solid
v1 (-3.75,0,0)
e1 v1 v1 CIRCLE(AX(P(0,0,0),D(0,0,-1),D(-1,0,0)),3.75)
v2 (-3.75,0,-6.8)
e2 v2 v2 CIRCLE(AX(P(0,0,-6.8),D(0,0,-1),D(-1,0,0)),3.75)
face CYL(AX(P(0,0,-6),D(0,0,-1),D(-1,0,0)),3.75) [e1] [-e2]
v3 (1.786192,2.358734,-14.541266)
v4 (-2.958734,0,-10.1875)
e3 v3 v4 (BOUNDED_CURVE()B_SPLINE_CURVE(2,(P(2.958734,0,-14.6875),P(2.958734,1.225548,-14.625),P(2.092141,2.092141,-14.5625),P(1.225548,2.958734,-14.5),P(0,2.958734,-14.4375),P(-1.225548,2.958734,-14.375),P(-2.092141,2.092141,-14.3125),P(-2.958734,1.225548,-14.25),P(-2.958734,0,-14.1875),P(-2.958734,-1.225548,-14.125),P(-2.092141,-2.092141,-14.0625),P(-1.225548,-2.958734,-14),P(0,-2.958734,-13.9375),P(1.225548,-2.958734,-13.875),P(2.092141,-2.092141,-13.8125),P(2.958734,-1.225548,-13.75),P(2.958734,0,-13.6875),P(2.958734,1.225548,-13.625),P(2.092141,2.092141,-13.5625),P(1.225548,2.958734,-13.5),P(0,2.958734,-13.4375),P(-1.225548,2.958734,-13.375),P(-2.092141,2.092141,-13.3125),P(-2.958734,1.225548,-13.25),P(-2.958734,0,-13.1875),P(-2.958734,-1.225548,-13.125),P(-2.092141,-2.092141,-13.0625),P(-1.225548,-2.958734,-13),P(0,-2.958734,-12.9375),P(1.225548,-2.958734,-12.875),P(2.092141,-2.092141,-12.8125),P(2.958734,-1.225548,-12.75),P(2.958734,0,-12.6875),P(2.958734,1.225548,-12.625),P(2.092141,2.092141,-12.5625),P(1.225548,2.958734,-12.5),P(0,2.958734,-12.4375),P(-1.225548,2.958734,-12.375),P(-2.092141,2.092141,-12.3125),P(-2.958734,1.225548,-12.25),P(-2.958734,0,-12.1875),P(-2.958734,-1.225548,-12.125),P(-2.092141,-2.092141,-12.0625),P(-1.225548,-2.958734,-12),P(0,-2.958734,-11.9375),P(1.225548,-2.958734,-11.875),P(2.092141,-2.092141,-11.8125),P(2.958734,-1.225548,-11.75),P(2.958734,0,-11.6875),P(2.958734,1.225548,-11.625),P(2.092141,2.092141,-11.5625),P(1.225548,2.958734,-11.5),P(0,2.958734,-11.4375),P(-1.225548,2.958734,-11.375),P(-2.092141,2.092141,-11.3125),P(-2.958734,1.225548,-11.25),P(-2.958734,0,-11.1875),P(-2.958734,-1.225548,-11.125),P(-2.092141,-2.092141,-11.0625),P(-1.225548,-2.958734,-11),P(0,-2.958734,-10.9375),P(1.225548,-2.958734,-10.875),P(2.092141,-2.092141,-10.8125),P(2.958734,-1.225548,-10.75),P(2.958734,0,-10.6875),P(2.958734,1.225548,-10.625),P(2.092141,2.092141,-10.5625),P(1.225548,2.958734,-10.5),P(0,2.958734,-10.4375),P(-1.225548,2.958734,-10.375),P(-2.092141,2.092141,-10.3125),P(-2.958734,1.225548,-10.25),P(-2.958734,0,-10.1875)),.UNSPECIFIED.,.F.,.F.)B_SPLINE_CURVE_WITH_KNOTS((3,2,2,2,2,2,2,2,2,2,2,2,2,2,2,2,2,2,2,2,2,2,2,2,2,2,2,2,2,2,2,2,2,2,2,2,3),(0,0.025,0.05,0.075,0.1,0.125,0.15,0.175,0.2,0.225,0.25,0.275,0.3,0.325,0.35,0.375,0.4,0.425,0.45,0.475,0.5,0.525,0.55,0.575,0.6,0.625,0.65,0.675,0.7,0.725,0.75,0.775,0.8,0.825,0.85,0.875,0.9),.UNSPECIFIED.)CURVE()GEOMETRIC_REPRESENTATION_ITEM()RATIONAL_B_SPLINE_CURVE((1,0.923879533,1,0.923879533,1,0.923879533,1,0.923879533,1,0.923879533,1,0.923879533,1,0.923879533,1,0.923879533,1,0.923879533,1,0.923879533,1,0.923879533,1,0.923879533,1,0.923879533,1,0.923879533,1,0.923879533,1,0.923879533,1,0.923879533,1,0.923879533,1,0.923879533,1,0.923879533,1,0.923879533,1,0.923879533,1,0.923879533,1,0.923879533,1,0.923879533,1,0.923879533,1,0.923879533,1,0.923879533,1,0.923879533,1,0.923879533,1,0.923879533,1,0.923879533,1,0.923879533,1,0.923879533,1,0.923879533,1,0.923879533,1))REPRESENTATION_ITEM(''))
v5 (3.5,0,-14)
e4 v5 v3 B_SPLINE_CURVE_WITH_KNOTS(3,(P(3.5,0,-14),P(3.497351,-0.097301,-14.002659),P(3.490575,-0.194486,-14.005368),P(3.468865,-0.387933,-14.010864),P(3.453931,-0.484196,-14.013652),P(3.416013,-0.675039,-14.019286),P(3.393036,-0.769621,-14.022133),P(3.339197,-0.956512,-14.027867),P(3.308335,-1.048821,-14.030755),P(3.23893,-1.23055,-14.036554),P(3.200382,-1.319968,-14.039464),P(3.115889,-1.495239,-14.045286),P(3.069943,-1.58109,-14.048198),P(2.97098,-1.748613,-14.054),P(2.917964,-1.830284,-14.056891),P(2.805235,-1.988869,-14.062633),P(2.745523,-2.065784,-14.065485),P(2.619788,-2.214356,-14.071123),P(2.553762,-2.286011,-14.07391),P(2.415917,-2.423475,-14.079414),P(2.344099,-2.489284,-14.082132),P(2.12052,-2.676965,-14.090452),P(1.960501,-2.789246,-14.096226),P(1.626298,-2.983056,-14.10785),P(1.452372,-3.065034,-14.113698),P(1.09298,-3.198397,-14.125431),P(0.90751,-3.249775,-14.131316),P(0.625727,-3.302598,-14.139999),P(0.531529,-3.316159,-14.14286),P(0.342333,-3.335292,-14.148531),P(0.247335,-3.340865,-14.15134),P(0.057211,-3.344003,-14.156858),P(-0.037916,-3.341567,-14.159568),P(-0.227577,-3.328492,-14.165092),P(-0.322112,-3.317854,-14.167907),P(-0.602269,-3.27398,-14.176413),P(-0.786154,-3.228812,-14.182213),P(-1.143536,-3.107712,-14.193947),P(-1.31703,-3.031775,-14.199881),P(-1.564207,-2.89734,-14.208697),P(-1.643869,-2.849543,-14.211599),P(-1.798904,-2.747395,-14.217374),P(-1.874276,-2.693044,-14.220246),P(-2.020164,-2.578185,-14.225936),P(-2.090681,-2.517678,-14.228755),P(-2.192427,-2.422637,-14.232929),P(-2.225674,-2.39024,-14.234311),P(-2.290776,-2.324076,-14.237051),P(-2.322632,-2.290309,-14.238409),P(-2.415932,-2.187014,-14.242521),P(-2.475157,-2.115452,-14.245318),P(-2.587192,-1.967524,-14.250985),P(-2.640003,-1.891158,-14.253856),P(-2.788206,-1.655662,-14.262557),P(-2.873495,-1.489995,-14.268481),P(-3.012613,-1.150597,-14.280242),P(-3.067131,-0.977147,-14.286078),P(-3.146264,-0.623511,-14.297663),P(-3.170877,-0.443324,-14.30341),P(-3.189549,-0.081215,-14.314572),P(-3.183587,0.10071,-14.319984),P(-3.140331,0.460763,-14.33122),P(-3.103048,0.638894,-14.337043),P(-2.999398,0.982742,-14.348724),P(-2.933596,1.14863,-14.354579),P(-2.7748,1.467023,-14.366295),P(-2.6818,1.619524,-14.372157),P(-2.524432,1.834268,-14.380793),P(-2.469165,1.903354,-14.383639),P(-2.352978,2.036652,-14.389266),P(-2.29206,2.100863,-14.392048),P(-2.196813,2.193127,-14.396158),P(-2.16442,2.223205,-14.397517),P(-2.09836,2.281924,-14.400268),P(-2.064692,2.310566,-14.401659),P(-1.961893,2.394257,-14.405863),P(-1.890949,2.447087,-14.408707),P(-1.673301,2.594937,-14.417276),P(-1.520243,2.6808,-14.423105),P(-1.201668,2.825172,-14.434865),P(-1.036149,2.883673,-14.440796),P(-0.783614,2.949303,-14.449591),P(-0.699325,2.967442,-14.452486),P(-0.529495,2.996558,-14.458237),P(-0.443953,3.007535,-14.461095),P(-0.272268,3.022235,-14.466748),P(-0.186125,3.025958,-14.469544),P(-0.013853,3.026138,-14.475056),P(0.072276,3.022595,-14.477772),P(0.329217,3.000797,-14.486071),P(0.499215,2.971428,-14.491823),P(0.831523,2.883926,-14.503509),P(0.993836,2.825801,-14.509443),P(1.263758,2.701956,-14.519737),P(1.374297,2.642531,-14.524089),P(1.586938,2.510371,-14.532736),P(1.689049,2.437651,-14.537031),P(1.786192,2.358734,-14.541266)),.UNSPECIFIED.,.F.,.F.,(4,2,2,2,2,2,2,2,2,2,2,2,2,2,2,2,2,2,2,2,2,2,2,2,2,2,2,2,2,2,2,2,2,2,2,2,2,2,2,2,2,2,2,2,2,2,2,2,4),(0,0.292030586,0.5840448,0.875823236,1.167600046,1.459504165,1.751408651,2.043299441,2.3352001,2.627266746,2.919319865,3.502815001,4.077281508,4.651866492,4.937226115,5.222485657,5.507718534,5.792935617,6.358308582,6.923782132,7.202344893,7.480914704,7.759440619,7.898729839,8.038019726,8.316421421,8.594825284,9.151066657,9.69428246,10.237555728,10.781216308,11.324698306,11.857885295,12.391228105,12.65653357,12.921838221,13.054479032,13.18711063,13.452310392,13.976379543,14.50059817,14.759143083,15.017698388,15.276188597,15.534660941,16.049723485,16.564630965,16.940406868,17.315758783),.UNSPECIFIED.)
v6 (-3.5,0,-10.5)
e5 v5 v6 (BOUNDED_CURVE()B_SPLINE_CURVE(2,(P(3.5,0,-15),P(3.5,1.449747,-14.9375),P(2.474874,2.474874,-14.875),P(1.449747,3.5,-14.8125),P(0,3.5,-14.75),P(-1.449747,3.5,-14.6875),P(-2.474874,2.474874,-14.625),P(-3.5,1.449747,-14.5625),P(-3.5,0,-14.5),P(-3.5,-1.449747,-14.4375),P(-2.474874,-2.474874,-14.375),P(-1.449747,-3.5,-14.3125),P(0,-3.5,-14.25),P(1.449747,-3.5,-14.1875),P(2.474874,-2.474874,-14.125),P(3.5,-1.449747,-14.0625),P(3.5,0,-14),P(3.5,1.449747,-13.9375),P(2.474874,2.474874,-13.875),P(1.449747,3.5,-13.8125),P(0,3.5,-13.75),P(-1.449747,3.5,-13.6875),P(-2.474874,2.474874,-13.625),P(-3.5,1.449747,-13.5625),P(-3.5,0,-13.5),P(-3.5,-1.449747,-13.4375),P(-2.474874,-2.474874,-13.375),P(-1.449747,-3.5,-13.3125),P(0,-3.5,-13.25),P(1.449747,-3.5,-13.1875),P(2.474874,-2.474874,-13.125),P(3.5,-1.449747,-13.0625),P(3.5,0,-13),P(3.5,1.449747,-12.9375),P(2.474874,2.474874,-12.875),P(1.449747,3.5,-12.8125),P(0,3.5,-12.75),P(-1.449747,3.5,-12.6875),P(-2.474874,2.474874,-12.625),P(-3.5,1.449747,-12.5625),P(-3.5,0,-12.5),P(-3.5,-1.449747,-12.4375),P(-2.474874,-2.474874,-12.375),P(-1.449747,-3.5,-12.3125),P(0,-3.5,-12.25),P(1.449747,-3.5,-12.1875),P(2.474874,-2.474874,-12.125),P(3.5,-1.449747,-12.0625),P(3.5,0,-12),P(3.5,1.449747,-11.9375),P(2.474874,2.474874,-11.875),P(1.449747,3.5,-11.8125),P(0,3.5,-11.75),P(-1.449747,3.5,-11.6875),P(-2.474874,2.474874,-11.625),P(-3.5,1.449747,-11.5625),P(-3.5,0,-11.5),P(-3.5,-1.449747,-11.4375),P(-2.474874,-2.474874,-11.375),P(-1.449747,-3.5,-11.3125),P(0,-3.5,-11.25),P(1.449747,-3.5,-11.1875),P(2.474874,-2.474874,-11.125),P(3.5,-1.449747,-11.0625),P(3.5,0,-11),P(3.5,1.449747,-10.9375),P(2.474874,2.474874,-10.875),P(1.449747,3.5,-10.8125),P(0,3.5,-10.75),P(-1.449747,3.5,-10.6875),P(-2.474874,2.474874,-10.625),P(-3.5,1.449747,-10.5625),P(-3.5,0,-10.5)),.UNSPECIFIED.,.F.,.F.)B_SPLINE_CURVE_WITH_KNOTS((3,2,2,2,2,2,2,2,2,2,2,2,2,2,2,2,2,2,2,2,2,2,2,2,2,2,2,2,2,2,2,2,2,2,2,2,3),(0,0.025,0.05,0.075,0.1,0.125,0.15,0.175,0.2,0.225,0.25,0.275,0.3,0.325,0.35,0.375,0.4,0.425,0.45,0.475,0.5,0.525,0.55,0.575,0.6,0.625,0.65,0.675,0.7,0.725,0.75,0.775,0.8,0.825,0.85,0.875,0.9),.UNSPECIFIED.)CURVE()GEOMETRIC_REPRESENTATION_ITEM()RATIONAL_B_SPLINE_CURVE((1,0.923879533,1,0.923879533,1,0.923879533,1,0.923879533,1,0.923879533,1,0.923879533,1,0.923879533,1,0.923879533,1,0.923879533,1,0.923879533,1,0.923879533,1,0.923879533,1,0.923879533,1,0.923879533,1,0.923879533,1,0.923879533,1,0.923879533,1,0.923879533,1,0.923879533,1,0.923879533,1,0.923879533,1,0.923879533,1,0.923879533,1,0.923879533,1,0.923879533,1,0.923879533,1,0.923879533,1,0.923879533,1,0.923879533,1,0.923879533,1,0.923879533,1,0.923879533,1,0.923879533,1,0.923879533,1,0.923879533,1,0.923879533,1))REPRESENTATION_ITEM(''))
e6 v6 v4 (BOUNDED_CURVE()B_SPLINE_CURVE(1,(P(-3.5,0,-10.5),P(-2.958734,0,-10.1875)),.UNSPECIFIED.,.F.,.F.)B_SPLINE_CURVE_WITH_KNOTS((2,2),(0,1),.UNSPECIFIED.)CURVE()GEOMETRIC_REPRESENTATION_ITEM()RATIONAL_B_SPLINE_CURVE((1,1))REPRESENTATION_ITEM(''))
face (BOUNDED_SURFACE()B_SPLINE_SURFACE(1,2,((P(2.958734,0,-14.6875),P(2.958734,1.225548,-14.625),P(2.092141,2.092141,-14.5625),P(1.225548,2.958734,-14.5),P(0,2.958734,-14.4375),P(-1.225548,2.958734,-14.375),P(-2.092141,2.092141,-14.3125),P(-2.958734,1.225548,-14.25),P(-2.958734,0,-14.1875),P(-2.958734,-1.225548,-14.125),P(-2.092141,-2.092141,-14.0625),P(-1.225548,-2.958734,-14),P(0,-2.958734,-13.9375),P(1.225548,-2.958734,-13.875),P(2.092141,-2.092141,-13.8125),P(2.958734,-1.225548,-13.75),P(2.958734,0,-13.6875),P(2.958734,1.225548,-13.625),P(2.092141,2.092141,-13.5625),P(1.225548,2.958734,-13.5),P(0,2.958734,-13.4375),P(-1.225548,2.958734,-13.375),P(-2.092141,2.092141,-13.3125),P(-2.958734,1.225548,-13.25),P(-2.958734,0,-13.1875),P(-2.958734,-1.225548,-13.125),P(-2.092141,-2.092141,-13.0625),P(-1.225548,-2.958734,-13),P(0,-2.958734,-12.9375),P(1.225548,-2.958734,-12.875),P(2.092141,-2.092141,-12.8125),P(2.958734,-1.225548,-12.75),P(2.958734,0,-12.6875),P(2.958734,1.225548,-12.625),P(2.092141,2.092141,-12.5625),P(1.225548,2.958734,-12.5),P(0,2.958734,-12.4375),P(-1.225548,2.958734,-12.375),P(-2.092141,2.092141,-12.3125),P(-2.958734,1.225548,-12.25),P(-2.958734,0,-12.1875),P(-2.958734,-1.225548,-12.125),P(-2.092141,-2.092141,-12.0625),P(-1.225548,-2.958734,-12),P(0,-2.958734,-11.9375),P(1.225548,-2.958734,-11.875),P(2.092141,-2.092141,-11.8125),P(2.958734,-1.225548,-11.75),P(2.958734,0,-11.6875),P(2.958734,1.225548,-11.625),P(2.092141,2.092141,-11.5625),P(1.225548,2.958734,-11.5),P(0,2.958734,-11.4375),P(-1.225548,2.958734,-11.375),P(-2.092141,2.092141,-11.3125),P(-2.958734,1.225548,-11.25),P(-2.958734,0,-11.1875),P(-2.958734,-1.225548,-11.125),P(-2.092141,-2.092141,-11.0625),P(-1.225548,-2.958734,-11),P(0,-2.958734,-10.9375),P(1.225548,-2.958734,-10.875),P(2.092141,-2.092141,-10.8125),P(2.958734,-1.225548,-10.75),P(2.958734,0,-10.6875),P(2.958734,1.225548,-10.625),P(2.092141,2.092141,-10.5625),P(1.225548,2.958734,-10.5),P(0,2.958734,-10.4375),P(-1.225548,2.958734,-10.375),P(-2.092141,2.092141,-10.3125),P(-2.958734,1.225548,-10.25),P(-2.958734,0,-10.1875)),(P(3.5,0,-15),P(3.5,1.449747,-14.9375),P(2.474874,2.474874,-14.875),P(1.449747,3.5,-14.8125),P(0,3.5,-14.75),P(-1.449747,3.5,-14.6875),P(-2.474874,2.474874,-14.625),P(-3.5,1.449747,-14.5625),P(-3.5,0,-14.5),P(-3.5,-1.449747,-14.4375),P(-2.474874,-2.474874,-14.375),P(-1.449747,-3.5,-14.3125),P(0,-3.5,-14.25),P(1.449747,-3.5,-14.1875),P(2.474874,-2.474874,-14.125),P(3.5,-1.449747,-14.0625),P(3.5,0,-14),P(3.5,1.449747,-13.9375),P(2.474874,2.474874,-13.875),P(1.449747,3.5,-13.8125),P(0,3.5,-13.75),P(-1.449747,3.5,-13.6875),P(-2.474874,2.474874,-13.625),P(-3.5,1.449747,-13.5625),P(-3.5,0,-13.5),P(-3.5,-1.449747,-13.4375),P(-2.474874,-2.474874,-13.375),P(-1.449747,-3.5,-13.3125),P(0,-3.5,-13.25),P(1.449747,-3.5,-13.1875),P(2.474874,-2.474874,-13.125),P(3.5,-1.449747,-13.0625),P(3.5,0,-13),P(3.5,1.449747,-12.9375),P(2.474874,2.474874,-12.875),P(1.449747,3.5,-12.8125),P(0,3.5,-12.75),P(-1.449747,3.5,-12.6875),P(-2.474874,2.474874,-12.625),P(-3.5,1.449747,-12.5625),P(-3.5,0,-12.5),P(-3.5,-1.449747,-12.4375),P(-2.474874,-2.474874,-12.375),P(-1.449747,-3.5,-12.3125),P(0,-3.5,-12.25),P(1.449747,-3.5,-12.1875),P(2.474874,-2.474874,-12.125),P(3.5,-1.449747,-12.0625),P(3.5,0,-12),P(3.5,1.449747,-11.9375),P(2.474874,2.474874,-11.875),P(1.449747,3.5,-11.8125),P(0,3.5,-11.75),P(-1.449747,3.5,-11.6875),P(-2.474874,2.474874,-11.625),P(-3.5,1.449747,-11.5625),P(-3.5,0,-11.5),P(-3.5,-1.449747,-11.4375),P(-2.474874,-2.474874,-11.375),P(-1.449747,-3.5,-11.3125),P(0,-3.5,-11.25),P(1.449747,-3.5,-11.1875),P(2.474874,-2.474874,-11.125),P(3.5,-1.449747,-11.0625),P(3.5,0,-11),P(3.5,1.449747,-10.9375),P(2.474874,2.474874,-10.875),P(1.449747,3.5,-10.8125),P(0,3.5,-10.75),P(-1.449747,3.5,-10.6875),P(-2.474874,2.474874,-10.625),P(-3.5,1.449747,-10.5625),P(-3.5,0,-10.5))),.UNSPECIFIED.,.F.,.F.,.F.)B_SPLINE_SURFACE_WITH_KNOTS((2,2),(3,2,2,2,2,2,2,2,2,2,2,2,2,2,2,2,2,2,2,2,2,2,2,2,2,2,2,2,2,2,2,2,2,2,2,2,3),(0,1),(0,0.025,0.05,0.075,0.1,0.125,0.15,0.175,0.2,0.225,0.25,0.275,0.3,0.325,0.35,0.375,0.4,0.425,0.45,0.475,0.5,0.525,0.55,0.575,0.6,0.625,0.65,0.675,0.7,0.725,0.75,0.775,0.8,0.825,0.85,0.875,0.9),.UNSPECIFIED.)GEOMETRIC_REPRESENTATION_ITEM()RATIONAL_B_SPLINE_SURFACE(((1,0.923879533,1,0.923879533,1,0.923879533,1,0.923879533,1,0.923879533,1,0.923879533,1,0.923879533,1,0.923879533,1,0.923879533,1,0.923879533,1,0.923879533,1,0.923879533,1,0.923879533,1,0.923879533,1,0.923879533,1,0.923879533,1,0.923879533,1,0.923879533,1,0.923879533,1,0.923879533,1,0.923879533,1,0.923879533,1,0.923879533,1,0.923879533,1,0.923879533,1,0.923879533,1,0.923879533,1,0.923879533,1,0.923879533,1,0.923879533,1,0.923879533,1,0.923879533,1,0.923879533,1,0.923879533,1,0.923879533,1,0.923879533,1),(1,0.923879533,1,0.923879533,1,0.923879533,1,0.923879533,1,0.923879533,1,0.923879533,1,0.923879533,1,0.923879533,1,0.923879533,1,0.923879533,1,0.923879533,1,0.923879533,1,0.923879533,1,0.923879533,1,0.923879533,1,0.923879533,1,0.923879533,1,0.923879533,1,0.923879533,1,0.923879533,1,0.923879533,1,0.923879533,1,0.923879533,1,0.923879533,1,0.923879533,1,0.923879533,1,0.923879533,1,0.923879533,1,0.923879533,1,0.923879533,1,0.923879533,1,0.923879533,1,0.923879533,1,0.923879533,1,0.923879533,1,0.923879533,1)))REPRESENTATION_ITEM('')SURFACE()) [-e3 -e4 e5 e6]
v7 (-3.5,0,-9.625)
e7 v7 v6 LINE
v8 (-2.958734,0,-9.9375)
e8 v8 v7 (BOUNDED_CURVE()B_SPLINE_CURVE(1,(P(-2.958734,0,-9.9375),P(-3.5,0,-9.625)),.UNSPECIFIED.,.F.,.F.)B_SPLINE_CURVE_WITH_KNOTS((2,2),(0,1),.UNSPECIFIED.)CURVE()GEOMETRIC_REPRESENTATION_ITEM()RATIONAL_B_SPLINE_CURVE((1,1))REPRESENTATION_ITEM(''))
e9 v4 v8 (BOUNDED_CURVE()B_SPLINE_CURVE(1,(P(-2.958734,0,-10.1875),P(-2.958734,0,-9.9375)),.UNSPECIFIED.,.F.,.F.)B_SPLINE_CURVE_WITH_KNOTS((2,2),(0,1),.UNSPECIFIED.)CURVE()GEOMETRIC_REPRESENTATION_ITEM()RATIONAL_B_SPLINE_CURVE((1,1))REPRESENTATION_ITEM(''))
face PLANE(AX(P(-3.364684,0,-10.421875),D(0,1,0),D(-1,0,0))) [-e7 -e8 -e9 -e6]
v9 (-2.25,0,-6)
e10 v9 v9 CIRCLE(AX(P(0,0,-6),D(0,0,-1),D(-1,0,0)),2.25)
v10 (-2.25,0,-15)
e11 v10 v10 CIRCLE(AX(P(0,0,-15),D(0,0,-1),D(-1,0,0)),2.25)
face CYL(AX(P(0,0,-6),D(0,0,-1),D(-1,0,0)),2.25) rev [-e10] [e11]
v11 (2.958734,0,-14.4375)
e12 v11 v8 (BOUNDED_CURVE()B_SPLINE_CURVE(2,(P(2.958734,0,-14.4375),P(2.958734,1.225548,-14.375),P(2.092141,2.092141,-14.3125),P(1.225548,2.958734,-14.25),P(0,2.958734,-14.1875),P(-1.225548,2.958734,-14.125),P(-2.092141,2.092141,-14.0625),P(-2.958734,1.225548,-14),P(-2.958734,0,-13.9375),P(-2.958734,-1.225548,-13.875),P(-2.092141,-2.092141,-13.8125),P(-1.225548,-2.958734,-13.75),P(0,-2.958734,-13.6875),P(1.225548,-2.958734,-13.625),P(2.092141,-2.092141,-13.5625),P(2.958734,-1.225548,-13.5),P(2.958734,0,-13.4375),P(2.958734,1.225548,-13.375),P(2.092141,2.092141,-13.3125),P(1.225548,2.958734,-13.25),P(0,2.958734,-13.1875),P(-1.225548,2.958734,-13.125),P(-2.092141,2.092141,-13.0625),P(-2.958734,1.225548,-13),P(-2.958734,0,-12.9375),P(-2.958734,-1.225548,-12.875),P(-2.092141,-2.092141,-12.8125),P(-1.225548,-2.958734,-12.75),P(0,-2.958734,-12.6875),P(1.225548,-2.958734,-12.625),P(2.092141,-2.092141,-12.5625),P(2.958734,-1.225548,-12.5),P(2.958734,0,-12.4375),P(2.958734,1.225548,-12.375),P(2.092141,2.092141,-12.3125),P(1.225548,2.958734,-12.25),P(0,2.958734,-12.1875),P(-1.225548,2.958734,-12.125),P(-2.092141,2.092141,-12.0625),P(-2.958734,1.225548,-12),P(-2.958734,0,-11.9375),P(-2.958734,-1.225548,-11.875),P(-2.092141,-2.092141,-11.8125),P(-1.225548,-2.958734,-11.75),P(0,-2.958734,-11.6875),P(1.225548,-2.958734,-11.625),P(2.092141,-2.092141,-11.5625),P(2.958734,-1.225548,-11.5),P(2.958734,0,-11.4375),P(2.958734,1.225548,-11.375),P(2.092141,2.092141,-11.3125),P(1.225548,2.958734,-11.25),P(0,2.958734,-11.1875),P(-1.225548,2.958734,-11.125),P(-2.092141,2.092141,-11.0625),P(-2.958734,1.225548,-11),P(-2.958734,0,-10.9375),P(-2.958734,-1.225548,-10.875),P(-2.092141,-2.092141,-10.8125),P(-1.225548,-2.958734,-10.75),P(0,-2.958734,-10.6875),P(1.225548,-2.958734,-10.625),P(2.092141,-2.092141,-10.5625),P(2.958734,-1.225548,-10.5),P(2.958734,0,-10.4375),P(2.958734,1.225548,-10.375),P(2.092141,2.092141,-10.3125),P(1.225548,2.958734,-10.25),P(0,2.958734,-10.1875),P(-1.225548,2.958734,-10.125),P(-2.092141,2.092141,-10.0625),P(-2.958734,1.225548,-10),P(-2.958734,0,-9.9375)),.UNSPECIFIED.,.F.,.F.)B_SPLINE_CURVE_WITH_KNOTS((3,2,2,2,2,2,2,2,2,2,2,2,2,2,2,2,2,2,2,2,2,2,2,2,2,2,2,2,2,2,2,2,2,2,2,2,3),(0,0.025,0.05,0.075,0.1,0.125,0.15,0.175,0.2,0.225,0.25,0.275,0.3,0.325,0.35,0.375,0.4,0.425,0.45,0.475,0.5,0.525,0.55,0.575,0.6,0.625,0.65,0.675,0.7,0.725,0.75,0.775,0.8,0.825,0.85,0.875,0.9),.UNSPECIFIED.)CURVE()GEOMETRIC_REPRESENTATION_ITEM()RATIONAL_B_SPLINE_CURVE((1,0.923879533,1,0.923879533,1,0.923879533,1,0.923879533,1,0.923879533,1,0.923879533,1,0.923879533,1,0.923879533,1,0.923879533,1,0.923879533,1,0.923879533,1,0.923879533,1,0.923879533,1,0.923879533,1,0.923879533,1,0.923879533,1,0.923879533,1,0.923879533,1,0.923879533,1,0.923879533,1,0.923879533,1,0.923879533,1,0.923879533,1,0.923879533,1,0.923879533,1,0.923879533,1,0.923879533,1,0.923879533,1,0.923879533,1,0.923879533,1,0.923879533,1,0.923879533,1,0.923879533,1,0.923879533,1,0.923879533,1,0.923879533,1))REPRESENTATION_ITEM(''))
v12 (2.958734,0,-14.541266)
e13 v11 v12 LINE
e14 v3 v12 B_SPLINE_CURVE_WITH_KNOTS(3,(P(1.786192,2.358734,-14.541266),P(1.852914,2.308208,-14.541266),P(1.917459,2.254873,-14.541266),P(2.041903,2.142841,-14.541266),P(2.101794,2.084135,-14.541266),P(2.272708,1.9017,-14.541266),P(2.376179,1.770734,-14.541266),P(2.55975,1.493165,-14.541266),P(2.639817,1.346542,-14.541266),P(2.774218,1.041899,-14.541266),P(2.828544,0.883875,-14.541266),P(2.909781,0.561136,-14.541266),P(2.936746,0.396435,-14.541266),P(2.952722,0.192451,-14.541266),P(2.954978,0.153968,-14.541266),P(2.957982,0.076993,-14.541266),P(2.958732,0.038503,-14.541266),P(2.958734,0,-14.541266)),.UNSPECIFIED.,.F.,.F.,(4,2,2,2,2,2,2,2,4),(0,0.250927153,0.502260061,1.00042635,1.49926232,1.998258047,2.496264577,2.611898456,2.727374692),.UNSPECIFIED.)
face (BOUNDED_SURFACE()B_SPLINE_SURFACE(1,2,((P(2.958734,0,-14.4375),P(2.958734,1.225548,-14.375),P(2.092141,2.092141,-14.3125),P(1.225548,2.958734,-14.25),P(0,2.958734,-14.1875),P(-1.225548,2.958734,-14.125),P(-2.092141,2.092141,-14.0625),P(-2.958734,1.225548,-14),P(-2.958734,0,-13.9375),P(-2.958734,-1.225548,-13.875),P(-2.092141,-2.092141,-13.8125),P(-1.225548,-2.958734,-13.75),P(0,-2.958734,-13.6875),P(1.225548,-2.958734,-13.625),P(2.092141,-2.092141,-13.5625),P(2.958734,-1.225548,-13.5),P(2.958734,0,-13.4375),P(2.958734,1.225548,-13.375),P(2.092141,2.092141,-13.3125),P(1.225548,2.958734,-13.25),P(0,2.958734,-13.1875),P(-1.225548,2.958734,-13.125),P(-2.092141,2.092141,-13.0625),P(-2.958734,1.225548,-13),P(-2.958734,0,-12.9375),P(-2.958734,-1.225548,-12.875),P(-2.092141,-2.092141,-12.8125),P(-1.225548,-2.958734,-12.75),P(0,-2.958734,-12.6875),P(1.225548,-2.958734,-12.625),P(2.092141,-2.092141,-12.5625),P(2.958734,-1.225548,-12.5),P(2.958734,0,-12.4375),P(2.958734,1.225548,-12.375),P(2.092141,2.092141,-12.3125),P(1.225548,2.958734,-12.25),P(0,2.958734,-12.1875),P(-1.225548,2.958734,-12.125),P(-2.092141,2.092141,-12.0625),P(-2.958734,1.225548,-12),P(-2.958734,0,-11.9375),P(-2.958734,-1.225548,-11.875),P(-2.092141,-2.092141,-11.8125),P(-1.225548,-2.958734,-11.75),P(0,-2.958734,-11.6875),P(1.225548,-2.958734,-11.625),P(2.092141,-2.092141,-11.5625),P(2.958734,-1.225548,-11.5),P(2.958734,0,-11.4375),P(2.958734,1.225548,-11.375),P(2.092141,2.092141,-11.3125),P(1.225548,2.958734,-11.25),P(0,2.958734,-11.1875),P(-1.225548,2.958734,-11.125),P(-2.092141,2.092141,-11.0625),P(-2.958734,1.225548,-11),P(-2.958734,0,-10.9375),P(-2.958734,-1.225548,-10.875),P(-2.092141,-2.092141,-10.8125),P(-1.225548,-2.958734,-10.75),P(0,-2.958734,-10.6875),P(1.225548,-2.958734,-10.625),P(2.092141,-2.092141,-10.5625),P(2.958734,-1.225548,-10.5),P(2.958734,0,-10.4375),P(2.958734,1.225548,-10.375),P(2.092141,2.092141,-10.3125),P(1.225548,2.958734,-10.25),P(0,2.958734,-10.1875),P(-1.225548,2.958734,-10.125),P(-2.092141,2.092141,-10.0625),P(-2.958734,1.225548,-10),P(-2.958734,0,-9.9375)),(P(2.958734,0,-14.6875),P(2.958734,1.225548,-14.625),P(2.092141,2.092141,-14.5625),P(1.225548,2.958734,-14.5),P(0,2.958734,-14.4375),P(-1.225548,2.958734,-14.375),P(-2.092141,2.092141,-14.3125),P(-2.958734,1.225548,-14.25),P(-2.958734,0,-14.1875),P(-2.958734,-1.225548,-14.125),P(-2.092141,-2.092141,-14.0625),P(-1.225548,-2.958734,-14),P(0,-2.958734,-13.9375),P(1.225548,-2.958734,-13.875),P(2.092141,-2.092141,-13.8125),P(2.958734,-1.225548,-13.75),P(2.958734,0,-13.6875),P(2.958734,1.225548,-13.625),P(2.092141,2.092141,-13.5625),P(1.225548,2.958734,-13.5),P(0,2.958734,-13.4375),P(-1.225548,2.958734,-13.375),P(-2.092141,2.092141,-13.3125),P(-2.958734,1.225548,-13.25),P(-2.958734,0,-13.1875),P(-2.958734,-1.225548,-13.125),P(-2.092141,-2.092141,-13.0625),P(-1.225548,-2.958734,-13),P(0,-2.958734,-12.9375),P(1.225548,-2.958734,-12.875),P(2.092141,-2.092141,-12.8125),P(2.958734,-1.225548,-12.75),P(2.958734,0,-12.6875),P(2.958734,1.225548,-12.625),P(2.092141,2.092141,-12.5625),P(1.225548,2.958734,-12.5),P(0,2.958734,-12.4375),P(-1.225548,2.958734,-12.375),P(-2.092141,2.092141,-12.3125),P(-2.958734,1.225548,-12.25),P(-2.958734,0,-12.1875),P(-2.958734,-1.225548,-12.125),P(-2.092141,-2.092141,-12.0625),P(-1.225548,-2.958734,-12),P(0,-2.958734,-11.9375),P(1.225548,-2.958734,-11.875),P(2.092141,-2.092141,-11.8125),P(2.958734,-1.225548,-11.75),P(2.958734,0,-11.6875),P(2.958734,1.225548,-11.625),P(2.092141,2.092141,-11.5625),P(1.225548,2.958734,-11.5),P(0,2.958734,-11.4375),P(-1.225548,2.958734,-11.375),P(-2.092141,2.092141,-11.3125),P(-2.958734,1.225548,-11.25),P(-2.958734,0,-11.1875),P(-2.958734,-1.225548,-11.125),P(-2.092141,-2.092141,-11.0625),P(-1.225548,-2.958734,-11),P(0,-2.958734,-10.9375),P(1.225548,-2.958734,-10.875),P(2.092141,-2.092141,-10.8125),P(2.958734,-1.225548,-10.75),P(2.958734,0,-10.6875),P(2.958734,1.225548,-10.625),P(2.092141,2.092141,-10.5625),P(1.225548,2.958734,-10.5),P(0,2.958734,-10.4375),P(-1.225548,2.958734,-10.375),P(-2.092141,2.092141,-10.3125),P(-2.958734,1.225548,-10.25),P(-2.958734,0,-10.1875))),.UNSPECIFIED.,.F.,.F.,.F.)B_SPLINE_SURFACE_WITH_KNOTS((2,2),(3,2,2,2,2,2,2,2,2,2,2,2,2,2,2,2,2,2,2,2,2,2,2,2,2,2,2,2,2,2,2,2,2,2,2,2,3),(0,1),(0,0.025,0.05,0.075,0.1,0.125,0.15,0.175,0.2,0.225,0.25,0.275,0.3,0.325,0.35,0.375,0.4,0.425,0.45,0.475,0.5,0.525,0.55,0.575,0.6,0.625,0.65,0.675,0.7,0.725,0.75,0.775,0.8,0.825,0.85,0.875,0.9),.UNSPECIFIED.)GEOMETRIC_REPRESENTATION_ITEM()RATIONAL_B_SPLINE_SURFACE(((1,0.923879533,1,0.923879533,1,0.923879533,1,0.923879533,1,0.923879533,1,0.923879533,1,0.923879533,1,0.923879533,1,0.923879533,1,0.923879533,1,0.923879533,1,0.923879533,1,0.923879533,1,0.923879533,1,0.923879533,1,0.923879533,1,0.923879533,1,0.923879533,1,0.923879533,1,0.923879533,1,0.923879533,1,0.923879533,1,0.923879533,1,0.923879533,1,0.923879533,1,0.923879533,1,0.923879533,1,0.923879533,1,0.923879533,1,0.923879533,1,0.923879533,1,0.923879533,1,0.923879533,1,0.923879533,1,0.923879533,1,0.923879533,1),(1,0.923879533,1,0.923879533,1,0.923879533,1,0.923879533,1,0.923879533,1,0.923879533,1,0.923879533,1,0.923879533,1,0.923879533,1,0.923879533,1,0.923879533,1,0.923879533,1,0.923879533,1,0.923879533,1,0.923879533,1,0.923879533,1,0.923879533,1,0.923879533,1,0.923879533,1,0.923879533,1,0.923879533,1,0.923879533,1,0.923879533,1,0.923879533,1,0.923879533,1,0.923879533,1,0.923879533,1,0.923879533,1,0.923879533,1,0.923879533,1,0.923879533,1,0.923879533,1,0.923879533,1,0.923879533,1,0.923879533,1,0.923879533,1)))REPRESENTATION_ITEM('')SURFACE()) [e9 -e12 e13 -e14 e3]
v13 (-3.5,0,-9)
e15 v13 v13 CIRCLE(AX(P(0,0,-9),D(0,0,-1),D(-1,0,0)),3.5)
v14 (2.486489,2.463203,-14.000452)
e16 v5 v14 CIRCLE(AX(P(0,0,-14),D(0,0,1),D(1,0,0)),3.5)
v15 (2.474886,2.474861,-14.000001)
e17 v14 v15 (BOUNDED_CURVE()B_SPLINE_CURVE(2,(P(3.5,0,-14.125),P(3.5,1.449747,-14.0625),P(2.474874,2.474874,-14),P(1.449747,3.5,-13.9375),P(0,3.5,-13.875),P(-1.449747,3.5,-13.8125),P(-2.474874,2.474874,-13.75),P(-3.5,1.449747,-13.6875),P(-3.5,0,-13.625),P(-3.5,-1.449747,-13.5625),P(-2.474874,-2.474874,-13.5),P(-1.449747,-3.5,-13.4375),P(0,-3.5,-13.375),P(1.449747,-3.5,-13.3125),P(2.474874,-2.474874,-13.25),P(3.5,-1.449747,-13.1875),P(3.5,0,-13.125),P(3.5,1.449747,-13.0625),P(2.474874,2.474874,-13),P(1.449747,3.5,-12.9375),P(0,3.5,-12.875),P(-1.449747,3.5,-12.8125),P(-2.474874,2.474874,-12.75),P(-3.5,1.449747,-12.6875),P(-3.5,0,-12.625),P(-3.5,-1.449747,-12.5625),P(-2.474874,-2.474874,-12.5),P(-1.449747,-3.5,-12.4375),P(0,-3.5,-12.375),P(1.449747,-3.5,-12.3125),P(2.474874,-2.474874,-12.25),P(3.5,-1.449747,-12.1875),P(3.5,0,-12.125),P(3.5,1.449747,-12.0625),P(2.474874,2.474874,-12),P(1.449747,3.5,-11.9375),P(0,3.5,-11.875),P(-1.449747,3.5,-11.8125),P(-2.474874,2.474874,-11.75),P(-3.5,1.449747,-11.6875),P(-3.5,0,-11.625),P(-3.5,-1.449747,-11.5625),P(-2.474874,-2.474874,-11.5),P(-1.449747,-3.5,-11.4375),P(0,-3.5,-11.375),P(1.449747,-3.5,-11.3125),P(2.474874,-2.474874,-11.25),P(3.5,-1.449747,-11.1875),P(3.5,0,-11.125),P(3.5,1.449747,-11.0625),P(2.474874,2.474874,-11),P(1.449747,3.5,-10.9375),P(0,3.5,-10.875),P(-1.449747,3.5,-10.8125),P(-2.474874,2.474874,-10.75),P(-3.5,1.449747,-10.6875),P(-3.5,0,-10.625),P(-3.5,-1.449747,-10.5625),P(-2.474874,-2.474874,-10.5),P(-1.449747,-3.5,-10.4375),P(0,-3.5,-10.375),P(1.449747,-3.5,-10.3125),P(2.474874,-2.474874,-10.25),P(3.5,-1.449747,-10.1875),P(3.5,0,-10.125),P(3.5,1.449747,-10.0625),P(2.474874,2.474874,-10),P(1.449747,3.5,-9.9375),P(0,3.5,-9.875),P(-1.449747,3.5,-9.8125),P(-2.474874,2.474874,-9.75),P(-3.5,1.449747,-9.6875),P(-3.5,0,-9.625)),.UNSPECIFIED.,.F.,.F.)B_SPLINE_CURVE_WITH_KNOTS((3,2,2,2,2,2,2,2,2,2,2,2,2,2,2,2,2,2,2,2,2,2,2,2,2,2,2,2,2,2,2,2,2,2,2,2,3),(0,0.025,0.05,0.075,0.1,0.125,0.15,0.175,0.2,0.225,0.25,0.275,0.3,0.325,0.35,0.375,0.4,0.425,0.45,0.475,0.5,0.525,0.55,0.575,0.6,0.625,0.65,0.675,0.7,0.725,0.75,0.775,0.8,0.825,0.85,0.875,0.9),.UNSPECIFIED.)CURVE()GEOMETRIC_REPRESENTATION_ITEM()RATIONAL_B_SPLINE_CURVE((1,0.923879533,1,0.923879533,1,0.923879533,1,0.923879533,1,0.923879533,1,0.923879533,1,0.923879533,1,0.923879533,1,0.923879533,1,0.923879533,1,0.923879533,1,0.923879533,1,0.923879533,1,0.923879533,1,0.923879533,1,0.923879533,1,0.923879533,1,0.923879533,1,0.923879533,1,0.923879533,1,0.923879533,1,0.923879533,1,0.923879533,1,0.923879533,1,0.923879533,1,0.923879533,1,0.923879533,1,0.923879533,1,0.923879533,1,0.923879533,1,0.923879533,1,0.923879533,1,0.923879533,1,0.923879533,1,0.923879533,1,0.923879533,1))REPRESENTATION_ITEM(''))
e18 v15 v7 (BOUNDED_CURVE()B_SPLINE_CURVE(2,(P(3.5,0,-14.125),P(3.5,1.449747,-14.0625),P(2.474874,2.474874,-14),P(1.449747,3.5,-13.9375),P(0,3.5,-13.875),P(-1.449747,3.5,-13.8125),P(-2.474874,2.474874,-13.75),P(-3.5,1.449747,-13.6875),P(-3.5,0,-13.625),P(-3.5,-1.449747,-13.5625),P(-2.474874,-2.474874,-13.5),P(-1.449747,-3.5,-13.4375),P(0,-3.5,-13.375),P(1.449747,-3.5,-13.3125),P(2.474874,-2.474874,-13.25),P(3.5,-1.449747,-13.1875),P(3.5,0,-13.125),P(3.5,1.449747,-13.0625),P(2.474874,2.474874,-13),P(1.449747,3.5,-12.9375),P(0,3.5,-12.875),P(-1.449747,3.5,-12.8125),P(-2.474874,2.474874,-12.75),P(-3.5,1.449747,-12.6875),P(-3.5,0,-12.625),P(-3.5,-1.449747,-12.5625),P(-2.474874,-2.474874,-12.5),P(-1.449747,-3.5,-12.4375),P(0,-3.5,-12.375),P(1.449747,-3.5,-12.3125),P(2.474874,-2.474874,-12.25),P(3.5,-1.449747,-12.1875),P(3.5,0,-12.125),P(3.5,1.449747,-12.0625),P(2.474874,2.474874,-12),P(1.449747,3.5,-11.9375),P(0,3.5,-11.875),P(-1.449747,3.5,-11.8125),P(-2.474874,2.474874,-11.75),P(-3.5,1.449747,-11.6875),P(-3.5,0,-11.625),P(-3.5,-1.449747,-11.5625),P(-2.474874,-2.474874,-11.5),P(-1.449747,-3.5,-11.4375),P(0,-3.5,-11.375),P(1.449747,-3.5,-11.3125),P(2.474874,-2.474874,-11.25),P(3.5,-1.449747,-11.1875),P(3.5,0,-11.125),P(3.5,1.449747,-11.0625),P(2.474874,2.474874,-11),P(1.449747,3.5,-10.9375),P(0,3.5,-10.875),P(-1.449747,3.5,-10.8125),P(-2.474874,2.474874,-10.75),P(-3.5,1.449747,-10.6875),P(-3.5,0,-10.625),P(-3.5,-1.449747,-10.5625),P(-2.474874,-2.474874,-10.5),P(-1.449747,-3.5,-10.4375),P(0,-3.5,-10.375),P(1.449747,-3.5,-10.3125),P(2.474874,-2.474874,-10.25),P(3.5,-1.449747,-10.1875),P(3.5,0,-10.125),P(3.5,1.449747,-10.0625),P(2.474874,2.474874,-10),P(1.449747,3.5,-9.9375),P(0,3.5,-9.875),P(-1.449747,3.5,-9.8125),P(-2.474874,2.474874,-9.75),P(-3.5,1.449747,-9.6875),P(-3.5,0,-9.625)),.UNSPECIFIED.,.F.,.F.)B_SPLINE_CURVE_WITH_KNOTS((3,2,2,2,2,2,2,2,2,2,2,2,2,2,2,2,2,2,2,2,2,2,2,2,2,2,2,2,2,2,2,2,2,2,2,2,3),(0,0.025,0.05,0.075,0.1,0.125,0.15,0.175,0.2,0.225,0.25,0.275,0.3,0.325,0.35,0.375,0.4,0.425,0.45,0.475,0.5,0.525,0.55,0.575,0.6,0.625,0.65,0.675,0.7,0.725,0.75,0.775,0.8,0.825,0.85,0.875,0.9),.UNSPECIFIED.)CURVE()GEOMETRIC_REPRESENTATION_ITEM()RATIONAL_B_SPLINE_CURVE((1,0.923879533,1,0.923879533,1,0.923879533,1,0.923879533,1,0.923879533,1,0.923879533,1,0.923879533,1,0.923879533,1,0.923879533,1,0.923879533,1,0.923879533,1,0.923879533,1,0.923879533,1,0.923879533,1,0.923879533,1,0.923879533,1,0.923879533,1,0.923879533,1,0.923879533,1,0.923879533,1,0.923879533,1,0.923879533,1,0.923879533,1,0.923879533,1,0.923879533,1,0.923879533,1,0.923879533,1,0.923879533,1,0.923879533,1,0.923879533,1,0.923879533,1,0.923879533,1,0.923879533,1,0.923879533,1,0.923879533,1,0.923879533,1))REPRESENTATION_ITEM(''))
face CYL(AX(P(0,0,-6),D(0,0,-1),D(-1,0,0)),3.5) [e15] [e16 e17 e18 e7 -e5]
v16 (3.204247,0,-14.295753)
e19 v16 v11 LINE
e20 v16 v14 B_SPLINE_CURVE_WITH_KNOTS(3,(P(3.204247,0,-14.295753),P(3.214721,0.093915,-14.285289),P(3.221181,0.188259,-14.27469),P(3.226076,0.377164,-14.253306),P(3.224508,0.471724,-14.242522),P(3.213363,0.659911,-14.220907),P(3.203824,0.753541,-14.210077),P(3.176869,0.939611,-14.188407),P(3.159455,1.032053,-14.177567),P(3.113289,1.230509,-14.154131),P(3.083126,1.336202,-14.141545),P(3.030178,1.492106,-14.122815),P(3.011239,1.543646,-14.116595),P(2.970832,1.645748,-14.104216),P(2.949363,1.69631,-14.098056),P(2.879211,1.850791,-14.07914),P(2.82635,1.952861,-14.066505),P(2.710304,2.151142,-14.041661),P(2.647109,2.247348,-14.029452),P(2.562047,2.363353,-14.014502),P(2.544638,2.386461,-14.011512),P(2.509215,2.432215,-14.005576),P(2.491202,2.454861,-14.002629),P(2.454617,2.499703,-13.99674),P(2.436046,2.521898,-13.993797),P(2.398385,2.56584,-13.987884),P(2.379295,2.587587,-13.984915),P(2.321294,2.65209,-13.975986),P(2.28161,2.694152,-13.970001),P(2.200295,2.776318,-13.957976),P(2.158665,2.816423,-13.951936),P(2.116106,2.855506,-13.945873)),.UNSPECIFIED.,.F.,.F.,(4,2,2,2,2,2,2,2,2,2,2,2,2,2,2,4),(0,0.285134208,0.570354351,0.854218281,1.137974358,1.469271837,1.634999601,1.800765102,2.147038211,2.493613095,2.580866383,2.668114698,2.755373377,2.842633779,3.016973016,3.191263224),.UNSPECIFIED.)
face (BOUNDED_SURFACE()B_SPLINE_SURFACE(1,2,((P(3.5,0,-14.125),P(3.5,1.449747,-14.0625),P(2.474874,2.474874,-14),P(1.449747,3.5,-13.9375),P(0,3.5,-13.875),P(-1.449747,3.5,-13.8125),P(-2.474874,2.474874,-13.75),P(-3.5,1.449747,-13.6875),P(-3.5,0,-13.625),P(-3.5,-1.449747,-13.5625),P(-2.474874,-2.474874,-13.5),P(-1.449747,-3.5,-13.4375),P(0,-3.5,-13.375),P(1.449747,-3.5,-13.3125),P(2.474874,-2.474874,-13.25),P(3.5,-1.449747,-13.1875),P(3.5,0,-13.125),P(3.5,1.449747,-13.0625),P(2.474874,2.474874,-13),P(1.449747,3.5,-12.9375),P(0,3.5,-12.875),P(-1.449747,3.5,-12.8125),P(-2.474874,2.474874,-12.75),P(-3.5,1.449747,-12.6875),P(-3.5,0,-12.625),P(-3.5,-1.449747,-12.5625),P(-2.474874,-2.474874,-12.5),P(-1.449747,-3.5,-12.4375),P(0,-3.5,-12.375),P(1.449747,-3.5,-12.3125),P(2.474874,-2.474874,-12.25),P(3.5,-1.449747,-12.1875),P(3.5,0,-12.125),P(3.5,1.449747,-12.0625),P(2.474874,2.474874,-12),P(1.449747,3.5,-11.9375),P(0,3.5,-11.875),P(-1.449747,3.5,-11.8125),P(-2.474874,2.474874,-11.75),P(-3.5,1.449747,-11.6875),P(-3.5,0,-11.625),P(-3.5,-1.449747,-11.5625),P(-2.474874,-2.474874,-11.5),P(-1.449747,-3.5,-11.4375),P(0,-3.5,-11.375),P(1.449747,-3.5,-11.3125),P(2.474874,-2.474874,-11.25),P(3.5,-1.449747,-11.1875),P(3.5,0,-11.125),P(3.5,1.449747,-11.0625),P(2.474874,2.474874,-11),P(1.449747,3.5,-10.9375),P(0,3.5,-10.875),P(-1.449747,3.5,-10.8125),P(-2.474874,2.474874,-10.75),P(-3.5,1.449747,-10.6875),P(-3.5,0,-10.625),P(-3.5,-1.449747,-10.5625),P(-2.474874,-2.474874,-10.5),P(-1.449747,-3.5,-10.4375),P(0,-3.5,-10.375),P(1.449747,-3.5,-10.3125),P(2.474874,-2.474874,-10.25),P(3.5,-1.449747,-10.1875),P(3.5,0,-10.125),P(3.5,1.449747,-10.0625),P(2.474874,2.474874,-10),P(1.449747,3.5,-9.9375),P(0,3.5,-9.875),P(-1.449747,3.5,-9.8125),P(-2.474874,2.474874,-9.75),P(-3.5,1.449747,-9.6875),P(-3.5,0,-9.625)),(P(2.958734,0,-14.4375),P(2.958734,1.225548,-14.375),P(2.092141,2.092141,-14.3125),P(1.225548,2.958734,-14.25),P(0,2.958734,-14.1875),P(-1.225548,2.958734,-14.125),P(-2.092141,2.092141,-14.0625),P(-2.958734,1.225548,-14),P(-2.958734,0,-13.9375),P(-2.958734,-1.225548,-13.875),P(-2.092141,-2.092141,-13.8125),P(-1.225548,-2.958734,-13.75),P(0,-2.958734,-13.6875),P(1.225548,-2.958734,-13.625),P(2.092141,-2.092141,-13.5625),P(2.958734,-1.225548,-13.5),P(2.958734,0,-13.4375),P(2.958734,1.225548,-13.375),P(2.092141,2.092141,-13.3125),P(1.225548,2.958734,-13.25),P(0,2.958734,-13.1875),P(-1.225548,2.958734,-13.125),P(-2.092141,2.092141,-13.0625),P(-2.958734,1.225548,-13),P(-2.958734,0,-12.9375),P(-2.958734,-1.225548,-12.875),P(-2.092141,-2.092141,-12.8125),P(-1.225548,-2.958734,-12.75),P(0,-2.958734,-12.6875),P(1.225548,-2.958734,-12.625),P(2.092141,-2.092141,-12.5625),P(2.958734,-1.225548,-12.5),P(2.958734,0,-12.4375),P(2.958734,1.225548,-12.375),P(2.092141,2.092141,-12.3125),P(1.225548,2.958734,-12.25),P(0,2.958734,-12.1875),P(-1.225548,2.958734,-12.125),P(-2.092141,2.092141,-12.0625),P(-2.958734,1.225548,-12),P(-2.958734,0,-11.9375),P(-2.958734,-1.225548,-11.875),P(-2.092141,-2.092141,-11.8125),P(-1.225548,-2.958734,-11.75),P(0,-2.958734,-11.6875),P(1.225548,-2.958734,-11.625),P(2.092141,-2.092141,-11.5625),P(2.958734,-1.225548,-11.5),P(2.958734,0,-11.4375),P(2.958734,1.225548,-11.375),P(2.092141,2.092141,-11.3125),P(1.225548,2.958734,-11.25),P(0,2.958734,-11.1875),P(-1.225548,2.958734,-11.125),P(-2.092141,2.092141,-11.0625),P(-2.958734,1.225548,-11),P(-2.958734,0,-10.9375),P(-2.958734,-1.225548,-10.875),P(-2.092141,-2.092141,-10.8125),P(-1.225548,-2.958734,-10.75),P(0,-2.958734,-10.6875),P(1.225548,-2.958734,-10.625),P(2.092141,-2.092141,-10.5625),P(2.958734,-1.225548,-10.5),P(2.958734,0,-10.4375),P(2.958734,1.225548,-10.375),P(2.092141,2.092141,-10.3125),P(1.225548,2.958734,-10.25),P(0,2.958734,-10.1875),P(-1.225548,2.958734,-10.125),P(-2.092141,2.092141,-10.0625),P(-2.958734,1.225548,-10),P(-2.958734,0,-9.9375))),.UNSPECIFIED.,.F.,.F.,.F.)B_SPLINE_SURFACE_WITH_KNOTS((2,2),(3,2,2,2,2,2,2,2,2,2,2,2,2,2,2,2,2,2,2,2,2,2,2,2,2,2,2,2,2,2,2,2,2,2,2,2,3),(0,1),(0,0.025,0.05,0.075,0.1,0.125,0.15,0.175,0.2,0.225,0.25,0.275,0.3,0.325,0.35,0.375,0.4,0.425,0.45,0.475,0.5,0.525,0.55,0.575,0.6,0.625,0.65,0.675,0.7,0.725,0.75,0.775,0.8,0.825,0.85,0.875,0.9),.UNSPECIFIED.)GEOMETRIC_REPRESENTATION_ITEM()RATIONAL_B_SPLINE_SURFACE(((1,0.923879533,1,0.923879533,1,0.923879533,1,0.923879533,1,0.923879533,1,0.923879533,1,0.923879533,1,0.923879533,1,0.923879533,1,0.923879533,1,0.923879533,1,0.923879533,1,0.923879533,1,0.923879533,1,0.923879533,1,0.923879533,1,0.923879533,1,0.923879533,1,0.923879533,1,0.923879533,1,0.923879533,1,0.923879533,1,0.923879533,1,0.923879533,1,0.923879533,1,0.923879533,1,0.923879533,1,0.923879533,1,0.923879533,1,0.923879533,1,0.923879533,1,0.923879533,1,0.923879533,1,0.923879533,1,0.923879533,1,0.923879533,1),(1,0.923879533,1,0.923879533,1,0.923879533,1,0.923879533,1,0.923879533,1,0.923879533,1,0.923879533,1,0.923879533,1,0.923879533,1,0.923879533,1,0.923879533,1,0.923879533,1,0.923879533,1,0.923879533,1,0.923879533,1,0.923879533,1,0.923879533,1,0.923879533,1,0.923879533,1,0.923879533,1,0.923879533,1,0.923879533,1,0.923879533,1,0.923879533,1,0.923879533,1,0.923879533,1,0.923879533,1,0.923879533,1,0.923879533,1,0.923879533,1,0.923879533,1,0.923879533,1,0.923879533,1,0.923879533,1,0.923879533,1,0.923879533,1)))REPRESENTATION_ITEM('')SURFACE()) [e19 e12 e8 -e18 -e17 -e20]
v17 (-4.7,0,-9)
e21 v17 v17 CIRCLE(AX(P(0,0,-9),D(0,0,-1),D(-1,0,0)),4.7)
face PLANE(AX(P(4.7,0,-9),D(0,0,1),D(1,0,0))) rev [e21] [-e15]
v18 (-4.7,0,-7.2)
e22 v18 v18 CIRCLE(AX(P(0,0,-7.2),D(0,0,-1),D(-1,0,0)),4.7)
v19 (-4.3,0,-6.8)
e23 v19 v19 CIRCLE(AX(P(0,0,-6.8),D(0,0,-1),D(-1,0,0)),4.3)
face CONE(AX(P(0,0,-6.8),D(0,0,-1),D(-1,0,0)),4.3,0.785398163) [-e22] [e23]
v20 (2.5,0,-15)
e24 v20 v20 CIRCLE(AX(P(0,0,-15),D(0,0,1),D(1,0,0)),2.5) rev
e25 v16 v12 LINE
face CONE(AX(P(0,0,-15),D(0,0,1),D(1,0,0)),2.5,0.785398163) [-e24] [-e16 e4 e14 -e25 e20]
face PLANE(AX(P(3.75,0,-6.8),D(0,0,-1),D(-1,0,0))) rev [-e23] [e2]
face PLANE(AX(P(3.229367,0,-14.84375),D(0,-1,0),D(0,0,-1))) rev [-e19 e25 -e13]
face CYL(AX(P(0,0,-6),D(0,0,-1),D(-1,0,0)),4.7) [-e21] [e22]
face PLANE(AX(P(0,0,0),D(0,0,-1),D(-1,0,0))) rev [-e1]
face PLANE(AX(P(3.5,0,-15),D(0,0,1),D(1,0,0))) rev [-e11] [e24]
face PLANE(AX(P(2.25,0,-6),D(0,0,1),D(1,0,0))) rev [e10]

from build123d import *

# Parameters (mm, degrees)
CHAMFER1_SIZE = 1
THREAD1_PITCH = 1


with BuildPart() as part:
    # Sketch2 → Revolve1 (revolve)
    with BuildSketch(Plane(origin=(0, 0, 0), x_dir=(1, 0, 0), z_dir=(0, 1, 0)), mode=Mode.PRIVATE) as revolve1_sk:
        Polygon((0, 0), (3.75, 0), (3.75, 6.8), (4.3, 6.8), (4.7, 7.2), (4.7, 9), (3.5, 9), (3.5, 15), (2.25, 15), (2.25, 6), (0, 6), align=None)
    revolve(revolve1_sk.sketch.rotate(Axis((0, 0, -6), (0, 0, 1)), 180), axis=Axis((0, 0, -6), (0, 0, 1)))

    # Chamfer1
    chamfer1_edges = [part.edges().sort_by_distance(p)[0] for p in [
        (3.5, 0, -15),
    ]]
    chamfer(chamfer1_edges, length=CHAMFER1_SIZE)

    # Thread1: the profile of Thread Profile1 profile screwed along a right-hand helix of 4.5 turns, 8 arcs to a turn; built about Z, then put on its axis
    thread1_z = Axis((0, 0, 0), (0, 0, 1))
    thread1_corners = [(3.5003, 0, -0.000173205), (3.5003, 0, 0.875173202), (2.958734125, 0, 0.562499999), (2.958734125, 0, 0.312499999)]
    with BuildLine(mode=Mode.PRIVATE) as thread1_profile:
        Line(thread1_corners[0], thread1_corners[1])
        Line(thread1_corners[1], thread1_corners[2])
        Line(thread1_corners[2], thread1_corners[3])
        Line(thread1_corners[3], thread1_corners[0])
    thread1_cap = Face(thread1_profile.wire())
    thread1_turn_angles = [0, 22.5, 45, 67.5, 90, 112.5, 135, 157.5, 180, 202.5, 225, 247.5, 270, 292.5, 315, 337.5, 360]
    thread1_turn_weights = [1, 0.9238795325112867, 1, 0.9238795325112867, 1, 0.9238795325112867, 1, 0.9238795325112867, 1, 0.9238795325112867, 1, 0.9238795325112867, 1, 0.9238795325112867, 1, 0.9238795325112867, 1]
    thread1_turn_rails = [Edge.make_bspline([Vector(p[0], p[1], 0).rotate(thread1_z, thread1_turn_angles[k]) / thread1_turn_weights[k] + Vector(0, 0, p[2] + THREAD1_PITCH * thread1_turn_angles[k] / 360) for k in range(17)], [0, 0, 0, 1, 1, 2, 2, 3, 3, 4, 4, 5, 5, 6, 6, 7, 7, 8, 8, 8], 2, thread1_turn_weights) for p in thread1_corners]
    thread1_turn_sides = [Face.make_surface_from_curves(thread1_turn_rails[p[0]], thread1_turn_rails[p[1]]) for p in [(0, 1), (1, 2), (2, 3), (3, 0)]]
    thread1_last_angles = [1440, 1462.5, 1485, 1507.5, 1530, 1552.5, 1575, 1597.5, 1620]
    thread1_last_weights = [1, 0.9238795325112867, 1, 0.9238795325112867, 1, 0.9238795325112867, 1, 0.9238795325112966, 1]
    thread1_last_rails = [Edge.make_bspline([Vector(p[0], p[1], 0).rotate(thread1_z, thread1_last_angles[k]) / thread1_last_weights[k] + Vector(0, 0, p[2] + THREAD1_PITCH * thread1_last_angles[k] / 360) for k in range(9)], [0, 0, 0, 1, 1, 2, 2, 3, 3, 4, 4, 4], 2, thread1_last_weights) for p in thread1_corners]
    thread1_last_sides = [Face.make_surface_from_curves(thread1_last_rails[p[0]], thread1_last_rails[p[1]]) for p in [(0, 1), (1, 2), (2, 3), (3, 0)]]
    thread1 = Plane(origin=(0, 0, -15), x_dir=(1, 0, 0), z_dir=(0, 0, 1)) * Solid(Shell([*[p.moved(Location((0, 0, THREAD1_PITCH * i))) for i in range(4) for p in thread1_turn_sides], *thread1_last_sides, thread1_cap, thread1_cap.rotate(thread1_z, 1620).moved(Location((0, 0, THREAD1_PITCH * 1620 / 360)))]))
    add(thread1, mode=Mode.SUBTRACT)


solid = part.part
